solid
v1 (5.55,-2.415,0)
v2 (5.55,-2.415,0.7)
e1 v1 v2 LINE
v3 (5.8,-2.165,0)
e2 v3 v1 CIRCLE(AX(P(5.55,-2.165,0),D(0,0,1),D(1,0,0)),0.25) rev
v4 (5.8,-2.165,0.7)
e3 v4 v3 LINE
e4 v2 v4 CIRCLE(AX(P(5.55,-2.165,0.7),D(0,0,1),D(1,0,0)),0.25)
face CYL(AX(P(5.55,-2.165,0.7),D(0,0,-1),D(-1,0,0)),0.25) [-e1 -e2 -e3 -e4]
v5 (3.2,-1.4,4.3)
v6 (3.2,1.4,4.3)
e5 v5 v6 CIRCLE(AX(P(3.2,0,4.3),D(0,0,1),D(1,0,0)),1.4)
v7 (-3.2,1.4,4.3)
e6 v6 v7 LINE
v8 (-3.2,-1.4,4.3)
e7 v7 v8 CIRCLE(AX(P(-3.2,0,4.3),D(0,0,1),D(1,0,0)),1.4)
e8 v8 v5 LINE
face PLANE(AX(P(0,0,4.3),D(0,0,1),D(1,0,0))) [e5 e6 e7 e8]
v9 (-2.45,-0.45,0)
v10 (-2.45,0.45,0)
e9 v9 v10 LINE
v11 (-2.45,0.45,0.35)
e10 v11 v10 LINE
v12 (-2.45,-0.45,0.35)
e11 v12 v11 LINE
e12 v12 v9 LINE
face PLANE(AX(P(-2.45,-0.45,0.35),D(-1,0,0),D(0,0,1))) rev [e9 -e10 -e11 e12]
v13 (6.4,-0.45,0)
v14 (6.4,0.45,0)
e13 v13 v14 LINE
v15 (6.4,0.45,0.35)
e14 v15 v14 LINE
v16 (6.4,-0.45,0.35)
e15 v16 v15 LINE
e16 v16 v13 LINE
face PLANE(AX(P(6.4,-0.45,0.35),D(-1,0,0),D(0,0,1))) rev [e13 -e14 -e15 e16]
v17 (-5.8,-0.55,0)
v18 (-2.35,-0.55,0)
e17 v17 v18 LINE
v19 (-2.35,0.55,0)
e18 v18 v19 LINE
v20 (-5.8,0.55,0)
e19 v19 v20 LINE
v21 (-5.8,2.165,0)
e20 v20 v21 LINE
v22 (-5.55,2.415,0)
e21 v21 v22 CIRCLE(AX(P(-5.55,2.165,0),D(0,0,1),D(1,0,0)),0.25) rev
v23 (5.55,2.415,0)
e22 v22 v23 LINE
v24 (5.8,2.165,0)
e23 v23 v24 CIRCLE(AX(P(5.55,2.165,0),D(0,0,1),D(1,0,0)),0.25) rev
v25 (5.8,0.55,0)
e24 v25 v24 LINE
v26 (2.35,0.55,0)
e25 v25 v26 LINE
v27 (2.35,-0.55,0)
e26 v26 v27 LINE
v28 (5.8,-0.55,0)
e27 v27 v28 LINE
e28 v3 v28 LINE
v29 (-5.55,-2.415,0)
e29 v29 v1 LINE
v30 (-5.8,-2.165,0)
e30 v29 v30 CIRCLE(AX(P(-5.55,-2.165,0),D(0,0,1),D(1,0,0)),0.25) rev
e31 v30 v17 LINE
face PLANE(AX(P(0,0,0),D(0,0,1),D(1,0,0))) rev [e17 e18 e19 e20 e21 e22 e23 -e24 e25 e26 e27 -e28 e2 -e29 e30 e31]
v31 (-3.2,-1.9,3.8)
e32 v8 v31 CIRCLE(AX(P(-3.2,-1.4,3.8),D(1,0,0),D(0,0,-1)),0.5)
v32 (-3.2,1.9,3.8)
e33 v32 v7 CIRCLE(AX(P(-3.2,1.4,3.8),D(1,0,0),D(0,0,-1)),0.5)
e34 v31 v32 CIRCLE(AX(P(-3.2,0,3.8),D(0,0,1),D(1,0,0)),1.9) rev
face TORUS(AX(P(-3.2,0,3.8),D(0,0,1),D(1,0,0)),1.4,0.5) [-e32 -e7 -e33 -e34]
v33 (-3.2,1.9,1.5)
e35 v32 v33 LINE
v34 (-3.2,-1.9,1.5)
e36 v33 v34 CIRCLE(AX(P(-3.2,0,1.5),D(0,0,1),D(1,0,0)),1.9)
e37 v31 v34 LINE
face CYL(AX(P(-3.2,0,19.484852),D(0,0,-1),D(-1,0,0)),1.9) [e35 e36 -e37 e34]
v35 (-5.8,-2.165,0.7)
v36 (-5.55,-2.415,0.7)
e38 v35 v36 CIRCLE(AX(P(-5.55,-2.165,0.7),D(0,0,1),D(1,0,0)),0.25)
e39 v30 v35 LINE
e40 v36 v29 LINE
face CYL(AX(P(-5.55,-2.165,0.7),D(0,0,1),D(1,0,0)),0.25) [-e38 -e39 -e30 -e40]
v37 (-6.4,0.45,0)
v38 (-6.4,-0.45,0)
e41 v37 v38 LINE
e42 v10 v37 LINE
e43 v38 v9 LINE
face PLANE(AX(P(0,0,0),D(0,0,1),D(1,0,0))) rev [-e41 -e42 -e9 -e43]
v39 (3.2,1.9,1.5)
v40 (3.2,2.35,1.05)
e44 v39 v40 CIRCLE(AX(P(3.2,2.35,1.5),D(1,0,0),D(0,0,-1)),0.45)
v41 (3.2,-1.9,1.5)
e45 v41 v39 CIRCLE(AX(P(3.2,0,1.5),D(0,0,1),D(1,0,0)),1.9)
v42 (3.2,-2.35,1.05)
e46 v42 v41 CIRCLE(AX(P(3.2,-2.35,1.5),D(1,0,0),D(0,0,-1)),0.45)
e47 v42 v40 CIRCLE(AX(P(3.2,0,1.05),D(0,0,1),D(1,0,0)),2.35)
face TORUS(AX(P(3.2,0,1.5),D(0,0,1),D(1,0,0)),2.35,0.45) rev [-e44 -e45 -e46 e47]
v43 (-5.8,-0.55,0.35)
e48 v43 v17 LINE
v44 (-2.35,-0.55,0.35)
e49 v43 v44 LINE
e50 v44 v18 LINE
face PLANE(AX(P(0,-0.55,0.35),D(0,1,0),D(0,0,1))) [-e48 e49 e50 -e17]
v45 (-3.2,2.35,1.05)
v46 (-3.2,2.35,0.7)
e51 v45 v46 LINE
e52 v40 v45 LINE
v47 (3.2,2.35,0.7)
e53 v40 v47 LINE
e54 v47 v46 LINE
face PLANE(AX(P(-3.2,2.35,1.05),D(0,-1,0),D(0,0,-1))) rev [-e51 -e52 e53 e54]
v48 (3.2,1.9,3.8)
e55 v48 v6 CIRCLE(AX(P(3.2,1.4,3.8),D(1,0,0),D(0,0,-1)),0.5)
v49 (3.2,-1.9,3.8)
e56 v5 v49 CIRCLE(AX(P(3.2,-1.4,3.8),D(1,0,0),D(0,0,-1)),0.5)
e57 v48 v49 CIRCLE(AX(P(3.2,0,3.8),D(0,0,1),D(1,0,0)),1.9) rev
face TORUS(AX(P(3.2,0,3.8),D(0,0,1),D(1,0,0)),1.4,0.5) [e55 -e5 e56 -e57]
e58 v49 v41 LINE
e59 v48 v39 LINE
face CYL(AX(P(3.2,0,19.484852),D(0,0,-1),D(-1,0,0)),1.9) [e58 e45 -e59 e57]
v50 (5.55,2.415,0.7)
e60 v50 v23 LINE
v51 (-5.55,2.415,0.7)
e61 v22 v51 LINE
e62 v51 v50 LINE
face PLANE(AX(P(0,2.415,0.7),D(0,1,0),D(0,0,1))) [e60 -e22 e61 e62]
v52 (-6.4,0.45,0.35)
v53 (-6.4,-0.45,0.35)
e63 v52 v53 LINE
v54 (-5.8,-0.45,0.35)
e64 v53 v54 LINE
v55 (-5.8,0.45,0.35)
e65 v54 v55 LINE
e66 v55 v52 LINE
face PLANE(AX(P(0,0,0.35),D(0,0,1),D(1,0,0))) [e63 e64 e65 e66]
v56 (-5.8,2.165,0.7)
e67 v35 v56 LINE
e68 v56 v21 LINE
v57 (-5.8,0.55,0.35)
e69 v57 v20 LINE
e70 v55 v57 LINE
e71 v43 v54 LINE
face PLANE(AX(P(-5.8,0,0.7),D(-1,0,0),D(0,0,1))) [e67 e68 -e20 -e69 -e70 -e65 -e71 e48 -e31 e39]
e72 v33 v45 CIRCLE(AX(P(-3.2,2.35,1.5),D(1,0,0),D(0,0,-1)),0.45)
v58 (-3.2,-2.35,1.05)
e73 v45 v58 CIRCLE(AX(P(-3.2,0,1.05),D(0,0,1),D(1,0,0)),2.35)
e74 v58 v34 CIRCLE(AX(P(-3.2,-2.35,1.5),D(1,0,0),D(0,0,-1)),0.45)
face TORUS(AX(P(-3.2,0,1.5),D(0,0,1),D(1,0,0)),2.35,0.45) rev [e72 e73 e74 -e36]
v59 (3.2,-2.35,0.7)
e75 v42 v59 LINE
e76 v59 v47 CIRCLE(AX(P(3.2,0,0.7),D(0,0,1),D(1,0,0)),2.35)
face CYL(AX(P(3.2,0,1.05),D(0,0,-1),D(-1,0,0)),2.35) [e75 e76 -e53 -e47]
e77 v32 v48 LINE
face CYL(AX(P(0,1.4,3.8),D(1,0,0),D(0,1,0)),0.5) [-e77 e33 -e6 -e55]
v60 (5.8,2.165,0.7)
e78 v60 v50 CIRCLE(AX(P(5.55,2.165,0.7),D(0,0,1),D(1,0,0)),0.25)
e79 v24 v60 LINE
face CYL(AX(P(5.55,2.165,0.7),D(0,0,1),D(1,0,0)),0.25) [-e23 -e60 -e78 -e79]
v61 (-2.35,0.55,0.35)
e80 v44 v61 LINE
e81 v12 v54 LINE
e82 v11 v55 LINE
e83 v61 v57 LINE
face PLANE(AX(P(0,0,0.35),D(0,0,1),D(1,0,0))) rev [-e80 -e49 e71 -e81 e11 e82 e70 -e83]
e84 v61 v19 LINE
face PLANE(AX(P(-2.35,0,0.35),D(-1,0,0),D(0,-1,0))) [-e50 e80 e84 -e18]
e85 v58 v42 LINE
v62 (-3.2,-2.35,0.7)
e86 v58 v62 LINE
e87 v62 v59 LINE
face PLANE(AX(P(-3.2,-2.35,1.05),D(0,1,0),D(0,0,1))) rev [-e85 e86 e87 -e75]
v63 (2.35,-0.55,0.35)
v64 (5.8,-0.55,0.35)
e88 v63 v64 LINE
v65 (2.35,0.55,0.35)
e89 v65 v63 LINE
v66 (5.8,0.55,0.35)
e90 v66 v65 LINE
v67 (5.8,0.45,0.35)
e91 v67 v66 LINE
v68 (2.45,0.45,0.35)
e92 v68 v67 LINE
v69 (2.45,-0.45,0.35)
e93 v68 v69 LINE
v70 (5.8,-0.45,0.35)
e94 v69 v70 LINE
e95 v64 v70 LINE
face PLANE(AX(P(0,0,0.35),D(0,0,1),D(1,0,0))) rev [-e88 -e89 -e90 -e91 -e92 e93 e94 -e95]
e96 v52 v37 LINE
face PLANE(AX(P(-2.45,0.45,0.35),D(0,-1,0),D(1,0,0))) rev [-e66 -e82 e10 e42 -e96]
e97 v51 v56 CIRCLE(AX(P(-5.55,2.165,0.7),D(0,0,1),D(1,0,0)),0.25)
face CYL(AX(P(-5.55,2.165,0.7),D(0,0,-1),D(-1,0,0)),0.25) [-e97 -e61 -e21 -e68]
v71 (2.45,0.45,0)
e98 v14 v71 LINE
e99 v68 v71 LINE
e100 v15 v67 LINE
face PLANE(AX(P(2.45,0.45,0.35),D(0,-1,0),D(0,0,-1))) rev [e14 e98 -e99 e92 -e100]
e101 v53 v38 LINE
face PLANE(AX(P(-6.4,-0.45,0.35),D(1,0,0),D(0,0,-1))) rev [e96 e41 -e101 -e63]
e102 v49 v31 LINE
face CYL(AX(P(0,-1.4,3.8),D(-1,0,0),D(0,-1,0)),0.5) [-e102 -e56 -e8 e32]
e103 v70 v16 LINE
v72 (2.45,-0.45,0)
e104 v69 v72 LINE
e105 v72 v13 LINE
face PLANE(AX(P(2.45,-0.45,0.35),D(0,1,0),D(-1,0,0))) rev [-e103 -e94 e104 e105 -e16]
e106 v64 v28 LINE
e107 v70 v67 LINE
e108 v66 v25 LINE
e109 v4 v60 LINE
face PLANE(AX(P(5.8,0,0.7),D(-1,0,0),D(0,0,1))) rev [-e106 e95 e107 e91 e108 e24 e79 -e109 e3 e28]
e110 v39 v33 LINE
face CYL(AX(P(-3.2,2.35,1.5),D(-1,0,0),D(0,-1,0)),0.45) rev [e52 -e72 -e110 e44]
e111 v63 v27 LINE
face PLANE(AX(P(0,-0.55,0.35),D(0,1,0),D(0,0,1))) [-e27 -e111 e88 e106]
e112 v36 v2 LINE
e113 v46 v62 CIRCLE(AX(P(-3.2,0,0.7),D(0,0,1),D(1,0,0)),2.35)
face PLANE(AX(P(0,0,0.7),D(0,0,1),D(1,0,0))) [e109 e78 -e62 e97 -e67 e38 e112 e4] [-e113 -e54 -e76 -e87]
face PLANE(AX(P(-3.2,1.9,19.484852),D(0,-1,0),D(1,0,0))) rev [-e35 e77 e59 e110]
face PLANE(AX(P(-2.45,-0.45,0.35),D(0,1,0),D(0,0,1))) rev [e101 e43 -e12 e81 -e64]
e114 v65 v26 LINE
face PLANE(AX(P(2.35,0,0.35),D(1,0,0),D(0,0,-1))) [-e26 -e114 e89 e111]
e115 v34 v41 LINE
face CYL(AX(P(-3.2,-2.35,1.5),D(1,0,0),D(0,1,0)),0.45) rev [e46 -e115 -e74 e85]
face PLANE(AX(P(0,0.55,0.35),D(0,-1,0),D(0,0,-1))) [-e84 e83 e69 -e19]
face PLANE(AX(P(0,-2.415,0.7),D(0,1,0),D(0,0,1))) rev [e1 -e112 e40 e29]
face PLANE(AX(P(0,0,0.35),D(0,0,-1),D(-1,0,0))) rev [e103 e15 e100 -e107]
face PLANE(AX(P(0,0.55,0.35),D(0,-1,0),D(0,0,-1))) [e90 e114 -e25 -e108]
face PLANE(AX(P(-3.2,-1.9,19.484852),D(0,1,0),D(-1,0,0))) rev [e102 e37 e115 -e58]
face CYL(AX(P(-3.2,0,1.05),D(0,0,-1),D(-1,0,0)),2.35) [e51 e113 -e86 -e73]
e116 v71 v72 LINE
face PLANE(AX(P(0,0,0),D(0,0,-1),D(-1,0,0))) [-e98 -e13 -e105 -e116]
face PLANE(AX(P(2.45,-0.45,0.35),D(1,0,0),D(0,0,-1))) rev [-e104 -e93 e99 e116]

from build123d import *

# Parameters (mm, degrees)
SKETCH1_W           = 3.45
SKETCH1_H           = 1.1
BOSS_EXTRUDE3_DEPTH = 0.7
SKETCH1_3_W         = 3.45
SKETCH1_3_H         = 1.1
CUT_EXTRUDE1_DEPTH  = 0.35
SKETCH2_W           = 3.95
SKETCH2_H           = 0.9
BOSS_EXTRUDE4_DEPTH = 0.35
BOSS_EXTRUDE5_DEPTH = 0.35
BOSS_EXTRUDE6_DEPTH = 3.25
FILLET1_R           = 0.5
FILLET2_R           = 0.45
FILLET3_R           = 0.25


with BuildPart() as part:
    # Sketch1 → Boss-Extrude3 (new body)
    with BuildSketch(Plane.XY):
        with Locations((4.075, 0)):
            Rectangle(SKETCH1_W, SKETCH1_H)
        with Locations((-4.075, 0)):
            Rectangle(SKETCH1_W, SKETCH1_H)
        Polygon((-2.35, 0.55), (-5.8, 0.55), (-5.8, 2.415), (5.8, 2.415), (5.8, 0.55), (2.35, 0.55), (2.35, -0.55), (5.8, -0.55), (5.8, -2.415), (-5.8, -2.415), (-5.8, -0.55), (-2.35, -0.55), align=None)
    extrude(amount=BOSS_EXTRUDE3_DEPTH)

    # Sketch1<3> → Cut-Extrude1 (cut)
    with BuildSketch(Plane.XY):
        with Locations((4.075, 0)):
            Rectangle(SKETCH1_3_W, SKETCH1_3_H)
        with Locations((-4.075, 0)):
            Rectangle(SKETCH1_3_W, SKETCH1_3_H)
    extrude(amount=CUT_EXTRUDE1_DEPTH, mode=Mode.SUBTRACT)

    # Sketch2 → Boss-Extrude4 (add)
    with BuildSketch(Plane.XY):
        with Locations((4.425, 0)):
            Rectangle(SKETCH2_W, SKETCH2_H)
        with Locations((-4.425, 0)):
            Rectangle(SKETCH2_W, SKETCH2_H)
    extrude(amount=BOSS_EXTRUDE4_DEPTH)

    # Sketch3 → Boss-Extrude5 (add)
    with BuildSketch(Plane.XY.offset(0.7)):
        with BuildLine():
            Line((-3.2, 2.35), (3.2, 2.35))
            ThreePointArc((3.2, 2.35), (5.55, 0), (3.2, -2.35))
            Line((3.2, -2.35), (-3.2, -2.35))
            ThreePointArc((-3.2, -2.35), (-5.55, 0), (-3.2, 2.35))
        make_face()
    extrude(amount=BOSS_EXTRUDE5_DEPTH)

    # Sketch4 → Boss-Extrude6 (add)
    with BuildSketch(Plane.XY.offset(1.05)):
        with BuildLine():
            Line((-3.2, 1.9), (3.2, 1.9))
            ThreePointArc((3.2, 1.9), (5.1, 0), (3.2, -1.9))
            Line((3.2, -1.9), (-3.2, -1.9))
            ThreePointArc((-3.2, -1.9), (-5.1, 0), (-3.2, 1.9))
        make_face()
    extrude(amount=BOSS_EXTRUDE6_DEPTH)

    # Fillet1
    fillet1_edges = [part.edges().sort_by_distance(p)[0] for p in [
        (0, 1.9, 4.3),
        (-5.1, 0, 4.3),
        (0, -1.9, 4.3),
        (5.1, 0, 4.3),
    ]]
    fillet(fillet1_edges, radius=FILLET1_R)

    # Fillet2
    fillet2_edges = [part.edges().sort_by_distance(p)[0] for p in [
        (-5.1, 0, 1.05),
        (0, -1.9, 1.05),
        (5.1, 0, 1.05),
        (0, 1.9, 1.05),
    ]]
    fillet(fillet2_edges, radius=FILLET2_R - 0.0001)  # a hair under: the kernel refuses the full size

    # Fillet3
    fillet3_edges = [part.edges().sort_by_distance(p)[0] for p in [
        (-5.8, 2.415, 0.35),
        (5.8, 2.415, 0.35),
        (5.8, -2.415, 0.35),
        (-5.8, -2.415, 0.35),
    ]]
    fillet(fillet3_edges, radius=FILLET3_R)


solid = part.part
